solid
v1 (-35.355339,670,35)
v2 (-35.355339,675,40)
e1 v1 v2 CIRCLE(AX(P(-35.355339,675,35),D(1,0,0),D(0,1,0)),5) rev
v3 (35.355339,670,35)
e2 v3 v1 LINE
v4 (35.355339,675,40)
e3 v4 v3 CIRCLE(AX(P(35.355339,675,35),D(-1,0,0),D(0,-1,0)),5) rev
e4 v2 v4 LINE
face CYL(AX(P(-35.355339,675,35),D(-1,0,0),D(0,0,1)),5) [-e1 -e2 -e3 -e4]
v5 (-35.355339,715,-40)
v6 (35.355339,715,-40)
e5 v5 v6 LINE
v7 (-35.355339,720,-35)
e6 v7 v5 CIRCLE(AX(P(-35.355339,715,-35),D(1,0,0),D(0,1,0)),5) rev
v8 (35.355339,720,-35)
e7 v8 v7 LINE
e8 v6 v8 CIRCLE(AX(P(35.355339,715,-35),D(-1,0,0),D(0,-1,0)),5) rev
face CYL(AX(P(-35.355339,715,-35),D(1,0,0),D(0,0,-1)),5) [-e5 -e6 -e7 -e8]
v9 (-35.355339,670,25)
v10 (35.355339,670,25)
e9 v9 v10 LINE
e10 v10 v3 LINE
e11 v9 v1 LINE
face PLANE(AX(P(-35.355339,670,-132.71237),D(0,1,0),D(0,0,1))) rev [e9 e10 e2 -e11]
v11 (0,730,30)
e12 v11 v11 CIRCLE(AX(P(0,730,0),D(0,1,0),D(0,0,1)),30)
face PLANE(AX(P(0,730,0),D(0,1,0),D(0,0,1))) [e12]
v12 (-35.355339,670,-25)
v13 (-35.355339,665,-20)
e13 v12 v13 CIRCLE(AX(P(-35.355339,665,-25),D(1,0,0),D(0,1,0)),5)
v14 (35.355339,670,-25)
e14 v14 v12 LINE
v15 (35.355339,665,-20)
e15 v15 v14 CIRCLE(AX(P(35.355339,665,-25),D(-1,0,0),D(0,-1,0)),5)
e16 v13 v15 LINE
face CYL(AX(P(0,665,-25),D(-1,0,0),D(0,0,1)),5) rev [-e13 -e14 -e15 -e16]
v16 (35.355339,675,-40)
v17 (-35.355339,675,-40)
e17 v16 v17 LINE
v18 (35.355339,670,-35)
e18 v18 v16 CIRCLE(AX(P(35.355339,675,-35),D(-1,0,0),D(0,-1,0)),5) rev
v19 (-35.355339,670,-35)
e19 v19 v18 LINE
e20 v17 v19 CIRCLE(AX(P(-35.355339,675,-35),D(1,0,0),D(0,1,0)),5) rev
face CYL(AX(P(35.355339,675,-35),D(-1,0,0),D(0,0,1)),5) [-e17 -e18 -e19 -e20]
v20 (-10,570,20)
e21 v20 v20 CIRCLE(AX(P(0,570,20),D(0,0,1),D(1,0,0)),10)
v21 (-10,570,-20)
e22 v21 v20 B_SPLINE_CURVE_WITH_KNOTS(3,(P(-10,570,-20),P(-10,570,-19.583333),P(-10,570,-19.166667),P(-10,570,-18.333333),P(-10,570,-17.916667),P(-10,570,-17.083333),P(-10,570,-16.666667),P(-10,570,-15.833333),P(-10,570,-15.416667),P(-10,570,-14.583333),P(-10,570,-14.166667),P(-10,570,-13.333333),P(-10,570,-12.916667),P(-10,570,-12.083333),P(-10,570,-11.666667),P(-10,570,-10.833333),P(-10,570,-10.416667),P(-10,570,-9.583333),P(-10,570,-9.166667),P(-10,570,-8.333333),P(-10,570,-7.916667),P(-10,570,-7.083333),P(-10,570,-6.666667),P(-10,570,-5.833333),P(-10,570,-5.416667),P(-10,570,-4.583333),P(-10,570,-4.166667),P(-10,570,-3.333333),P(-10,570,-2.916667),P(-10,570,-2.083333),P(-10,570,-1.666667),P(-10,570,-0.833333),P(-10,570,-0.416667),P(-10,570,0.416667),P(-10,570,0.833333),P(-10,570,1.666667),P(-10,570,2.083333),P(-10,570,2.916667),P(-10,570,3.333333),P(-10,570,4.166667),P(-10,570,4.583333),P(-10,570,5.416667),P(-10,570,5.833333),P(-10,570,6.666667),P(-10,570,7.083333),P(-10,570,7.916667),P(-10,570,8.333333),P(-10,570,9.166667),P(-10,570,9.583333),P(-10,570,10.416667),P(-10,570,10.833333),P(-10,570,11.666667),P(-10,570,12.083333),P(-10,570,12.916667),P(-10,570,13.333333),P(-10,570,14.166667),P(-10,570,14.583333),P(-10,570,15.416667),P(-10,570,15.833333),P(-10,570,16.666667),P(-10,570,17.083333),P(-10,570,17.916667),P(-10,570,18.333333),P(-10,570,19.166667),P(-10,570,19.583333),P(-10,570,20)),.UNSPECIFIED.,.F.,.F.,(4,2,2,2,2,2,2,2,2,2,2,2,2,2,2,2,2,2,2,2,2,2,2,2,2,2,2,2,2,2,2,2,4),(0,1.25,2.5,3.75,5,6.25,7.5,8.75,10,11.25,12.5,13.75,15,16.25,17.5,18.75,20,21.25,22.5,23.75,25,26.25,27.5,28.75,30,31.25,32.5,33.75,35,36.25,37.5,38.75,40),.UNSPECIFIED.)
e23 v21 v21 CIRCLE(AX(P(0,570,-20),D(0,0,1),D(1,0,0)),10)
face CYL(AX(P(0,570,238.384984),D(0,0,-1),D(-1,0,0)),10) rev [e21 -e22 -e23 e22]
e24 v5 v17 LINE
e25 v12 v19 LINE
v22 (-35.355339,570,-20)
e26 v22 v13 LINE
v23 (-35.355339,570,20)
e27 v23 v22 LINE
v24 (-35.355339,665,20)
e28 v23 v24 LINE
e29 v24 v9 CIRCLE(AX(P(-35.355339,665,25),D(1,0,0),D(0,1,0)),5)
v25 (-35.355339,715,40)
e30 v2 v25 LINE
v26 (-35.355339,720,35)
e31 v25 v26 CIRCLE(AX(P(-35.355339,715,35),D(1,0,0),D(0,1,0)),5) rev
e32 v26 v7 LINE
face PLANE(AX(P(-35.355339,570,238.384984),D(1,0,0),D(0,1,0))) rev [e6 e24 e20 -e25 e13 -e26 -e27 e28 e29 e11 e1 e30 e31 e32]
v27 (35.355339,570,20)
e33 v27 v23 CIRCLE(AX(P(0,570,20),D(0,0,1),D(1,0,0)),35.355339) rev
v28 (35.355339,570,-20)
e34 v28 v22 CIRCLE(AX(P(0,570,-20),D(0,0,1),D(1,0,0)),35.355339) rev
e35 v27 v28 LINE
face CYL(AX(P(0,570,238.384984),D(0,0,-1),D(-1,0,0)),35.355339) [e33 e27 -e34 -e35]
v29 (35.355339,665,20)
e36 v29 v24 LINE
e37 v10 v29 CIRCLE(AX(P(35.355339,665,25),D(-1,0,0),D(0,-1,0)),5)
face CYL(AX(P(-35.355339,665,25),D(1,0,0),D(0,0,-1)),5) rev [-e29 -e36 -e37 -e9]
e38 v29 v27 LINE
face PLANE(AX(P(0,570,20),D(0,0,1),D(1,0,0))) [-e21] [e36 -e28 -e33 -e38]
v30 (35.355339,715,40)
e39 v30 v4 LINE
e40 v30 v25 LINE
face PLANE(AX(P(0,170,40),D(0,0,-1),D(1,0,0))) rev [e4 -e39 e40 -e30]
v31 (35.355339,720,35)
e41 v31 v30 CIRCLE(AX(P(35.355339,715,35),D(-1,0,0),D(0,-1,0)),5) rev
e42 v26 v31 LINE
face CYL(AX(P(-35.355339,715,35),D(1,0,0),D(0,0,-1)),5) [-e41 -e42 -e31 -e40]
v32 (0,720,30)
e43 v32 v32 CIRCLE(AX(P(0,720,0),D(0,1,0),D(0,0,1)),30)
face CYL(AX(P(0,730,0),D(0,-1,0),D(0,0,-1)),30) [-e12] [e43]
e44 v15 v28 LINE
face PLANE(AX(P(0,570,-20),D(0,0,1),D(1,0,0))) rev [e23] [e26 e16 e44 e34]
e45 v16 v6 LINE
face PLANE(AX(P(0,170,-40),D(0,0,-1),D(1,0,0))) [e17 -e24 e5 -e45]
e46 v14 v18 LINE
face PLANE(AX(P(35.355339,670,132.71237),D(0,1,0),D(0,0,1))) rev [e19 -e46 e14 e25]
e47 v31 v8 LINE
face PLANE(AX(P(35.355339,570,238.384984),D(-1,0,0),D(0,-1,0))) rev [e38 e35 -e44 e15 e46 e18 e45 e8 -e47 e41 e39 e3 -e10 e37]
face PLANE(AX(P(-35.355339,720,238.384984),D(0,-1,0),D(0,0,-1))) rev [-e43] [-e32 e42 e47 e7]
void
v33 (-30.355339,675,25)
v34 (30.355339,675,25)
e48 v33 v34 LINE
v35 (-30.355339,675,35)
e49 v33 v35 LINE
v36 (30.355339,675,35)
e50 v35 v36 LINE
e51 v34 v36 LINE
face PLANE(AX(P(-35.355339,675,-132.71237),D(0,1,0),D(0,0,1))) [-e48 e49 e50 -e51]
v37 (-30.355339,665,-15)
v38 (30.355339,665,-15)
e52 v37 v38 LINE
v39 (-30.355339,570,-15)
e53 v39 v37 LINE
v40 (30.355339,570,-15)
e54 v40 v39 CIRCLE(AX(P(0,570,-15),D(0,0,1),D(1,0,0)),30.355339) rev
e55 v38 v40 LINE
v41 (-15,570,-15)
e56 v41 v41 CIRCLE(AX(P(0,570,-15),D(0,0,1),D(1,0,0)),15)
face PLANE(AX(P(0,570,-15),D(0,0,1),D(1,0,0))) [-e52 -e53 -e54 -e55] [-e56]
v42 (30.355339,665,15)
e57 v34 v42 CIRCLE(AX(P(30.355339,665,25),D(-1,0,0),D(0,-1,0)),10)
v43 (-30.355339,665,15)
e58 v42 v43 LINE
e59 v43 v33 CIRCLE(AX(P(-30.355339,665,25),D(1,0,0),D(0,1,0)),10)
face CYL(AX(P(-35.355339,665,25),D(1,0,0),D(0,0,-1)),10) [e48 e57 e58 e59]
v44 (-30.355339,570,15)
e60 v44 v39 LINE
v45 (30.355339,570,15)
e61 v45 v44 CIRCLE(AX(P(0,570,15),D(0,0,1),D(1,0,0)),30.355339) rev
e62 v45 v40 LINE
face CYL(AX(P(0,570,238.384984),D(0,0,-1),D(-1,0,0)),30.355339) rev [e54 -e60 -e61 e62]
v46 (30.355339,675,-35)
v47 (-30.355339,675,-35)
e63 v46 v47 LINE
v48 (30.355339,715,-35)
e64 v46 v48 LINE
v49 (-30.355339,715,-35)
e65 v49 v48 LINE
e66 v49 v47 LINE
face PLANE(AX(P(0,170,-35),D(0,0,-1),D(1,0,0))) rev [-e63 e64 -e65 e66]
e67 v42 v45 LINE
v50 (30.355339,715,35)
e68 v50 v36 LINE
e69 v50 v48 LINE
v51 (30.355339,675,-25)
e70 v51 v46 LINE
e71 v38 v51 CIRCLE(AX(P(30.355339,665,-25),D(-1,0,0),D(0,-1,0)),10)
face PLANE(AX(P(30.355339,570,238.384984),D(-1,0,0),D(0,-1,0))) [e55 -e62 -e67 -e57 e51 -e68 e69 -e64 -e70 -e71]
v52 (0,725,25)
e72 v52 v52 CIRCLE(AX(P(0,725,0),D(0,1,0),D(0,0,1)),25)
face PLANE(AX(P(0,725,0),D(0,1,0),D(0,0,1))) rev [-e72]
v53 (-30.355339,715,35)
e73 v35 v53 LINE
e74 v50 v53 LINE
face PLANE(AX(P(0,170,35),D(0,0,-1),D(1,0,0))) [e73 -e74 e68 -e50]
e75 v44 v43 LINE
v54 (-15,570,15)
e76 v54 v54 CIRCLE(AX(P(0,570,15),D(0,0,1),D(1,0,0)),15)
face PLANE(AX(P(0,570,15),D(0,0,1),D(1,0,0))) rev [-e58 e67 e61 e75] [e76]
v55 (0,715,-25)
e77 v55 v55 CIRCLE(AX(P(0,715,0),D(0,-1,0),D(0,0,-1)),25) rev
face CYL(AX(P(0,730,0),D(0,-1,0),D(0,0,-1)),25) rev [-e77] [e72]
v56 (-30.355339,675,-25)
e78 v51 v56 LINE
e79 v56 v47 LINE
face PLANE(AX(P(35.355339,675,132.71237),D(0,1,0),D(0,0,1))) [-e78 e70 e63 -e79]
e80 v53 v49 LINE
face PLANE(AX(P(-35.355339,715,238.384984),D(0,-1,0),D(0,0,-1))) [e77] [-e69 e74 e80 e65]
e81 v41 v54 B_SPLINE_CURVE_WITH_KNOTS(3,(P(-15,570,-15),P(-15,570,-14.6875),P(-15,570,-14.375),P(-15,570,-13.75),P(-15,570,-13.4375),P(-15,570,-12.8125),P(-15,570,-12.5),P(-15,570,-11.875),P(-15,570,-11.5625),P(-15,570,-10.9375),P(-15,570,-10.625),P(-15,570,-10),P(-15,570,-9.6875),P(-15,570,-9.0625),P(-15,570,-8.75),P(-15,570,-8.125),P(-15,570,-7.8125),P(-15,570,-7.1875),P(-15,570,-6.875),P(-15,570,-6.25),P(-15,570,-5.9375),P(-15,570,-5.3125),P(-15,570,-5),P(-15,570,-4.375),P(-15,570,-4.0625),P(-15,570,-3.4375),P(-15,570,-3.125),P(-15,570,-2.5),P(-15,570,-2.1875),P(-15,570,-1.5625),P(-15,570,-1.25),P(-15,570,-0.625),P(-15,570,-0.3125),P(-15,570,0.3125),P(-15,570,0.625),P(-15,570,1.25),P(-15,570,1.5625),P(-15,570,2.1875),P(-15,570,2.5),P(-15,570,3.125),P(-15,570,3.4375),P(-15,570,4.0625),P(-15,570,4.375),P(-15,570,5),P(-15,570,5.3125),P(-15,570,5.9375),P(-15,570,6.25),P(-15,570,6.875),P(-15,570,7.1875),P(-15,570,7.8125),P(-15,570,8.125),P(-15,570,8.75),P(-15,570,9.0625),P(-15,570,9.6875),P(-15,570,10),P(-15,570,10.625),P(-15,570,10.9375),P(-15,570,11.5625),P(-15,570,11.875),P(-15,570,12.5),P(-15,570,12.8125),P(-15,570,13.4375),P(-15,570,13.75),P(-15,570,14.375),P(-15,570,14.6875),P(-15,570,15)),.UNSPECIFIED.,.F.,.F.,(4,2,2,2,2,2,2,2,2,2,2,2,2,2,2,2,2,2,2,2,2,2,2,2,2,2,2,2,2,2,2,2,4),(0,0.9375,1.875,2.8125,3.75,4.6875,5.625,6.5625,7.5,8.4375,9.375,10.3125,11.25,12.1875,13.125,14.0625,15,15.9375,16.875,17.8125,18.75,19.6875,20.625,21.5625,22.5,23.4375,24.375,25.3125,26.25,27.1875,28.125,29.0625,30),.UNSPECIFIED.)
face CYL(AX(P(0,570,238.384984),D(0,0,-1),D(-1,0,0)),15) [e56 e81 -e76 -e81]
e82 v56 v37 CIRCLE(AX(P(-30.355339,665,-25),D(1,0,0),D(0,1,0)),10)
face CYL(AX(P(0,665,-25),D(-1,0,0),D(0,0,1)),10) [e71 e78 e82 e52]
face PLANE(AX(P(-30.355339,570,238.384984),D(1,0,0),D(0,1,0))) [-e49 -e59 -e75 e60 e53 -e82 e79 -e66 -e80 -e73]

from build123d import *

# Parameters (mm, degrees)
BOSS_EXTRUDE1_DEPTH      = 40
BOSS_EXTRUDE1_DEPTH_BACK = 40
SKETCH1_R                = 10
CUT_EXTRUDE1_START       = -20
CUT_EXTRUDE1_DEPTH       = 20
CUT_EXTRUDE2_START       = -20
CUT_EXTRUDE2_DEPTH       = 20
SKETCH6_R                = 30
BOSS_EXTRUDE2_DEPTH      = 10
FILLET2_R                = 5
SHELL1_START             = -15
SHELL1_OUTLINE_R         = 15
SHELL1_DEPTH             = 30
SHELL1_START_2           = -35
SHELL1_2_OUTLINE_W       = 60.710678118
SHELL1_2_OUTLINE_H       = 40
SHELL1_2_DEPTH           = 70
SHELL1_START_3           = 715
SHELL1_3_OUTLINE_R       = 25
SHELL1_3_DEPTH           = 10
SHELL1_START_4           = -30.355339059
SHELL1_4_DEPTH           = 60.710678118


with BuildPart() as part:
    # Sketch1 → Boss-Extrude1 (new, two sides: drawn at the far end of the back side and taken through both)
    with BuildSketch(Plane.XY.offset(-BOSS_EXTRUDE1_DEPTH_BACK)):
        with BuildLine():
            Line((-35.355339059, 570), (-35.355339059, 720))
            Line((-35.355339059, 720), (35.355339059, 720))
            Line((35.355339059, 720), (35.355339059, 570))
            ThreePointArc((35.355339059, 570), (0, 534.644660941), (-35.355339059, 570))
        make_face()
        with Locations(Location((0, 570, 0), (0, 0, 180))):
            Circle(SKETCH1_R, mode=Mode.SUBTRACT)
    extrude(amount=BOSS_EXTRUDE1_DEPTH + BOSS_EXTRUDE1_DEPTH_BACK)

    # Sketch2 → Cut-Extrude1 (cut)
    with BuildSketch(Plane.XY.offset(40).offset(CUT_EXTRUDE1_START)):
        with BuildLine():
            Line((-35.355339059, 570), (-35.355339059, 670))
            Line((-35.355339059, 670), (35.355339059, 670))
            Line((35.355339059, 670), (35.355339059, 570))
            ThreePointArc((35.355339059, 570), (0, 534.644660941), (-35.355339059, 570))
        make_face()
    extrude(amount=CUT_EXTRUDE1_DEPTH, mode=Mode.SUBTRACT)

    # Sketch3 → Cut-Extrude2 (cut)
    with BuildSketch(Plane(origin=(0, 0, -40), x_dir=(-1, 0, 0), z_dir=(0, 0, -1)).offset(CUT_EXTRUDE2_START)):
        with BuildLine():
            Line((-35.355339059, 570), (-35.355339059, 670))
            Line((-35.355339059, 670), (35.355339059, 670))
            Line((35.355339059, 670), (35.355339059, 570))
            ThreePointArc((35.355339059, 570), (0, 534.644660941), (-35.355339059, 570))
        make_face()
    extrude(amount=CUT_EXTRUDE2_DEPTH, mode=Mode.SUBTRACT)

    # Sketch6 → Boss-Extrude2 (add)
    with BuildSketch(Plane(origin=(0, 720, 0), x_dir=(1, 0, 0), z_dir=(0, 1, 0))):
        with Locations(Location((0, 0, 0), (0, 0, 270))):
            Circle(SKETCH6_R)
    extrude(amount=BOSS_EXTRUDE2_DEPTH)

    # Fillet2
    fillet2_edges = [part.edges().sort_by_distance(p)[0] for p in [
        (0, 720, -40),
        (0, 720, 40),
        (0, 670, 40),
        (0, 670, 20),
        (0, 670, -40),
        (0, 670, -20),
    ]]
    fillet(fillet2_edges, radius=FILLET2_R)

    # Shell1: read off the stored shape, not the designer's step
    # Shell1 outline → Shell1 (cut)
    with BuildSketch(Plane.XY.offset(SHELL1_START)):
        with BuildLine():
            ThreePointArc((-30.355339059, 570), (0, 539.644660941), (30.355339059, 570))
            Line((30.355339059, 570), (30.355339059, 715))
            Line((30.355339059, 715), (-30.355339059, 715))
            Line((-30.355339059, 715), (-30.355339059, 570))
        make_face()
        with Locations((0, 570)):
            Circle(SHELL1_OUTLINE_R, mode=Mode.SUBTRACT)
    extrude(amount=SHELL1_DEPTH, mode=Mode.SUBTRACT)

    # Shell1 2 outline → Shell1 2 (cut)
    with BuildSketch(Plane.XY.offset(SHELL1_START_2)):
        with Locations((0, 695)):
            Rectangle(SHELL1_2_OUTLINE_W, SHELL1_2_OUTLINE_H)
    extrude(amount=SHELL1_2_DEPTH, mode=Mode.SUBTRACT)

    # Shell1 3 outline → Shell1 3 (cut)
    with BuildSketch(Plane(origin=(0, 0, 0), x_dir=(1, 0, 0), z_dir=(0, 1, 0)).offset(SHELL1_START_3)):
        Circle(SHELL1_3_OUTLINE_R)
    extrude(amount=SHELL1_3_DEPTH, mode=Mode.SUBTRACT)

    # Shell1 4 outline → Shell1 4 (cut)
    with BuildSketch(Plane.YZ.offset(SHELL1_START_4)):
        with BuildLine():
            ThreePointArc((675, 25), (672.071067812, 17.928932188), (665, 15))
            Line((665, 15), (675, 15))
            Line((675, 15), (675, 25))
        make_face()
        with BuildLine():
            Line((675, -15), (665, -15))
            ThreePointArc((665, -15), (672.071067812, -17.928932188), (675, -25))
            Line((675, -25), (675, -15))
        make_face()
    extrude(amount=SHELL1_4_DEPTH, mode=Mode.SUBTRACT)


solid = part.part
